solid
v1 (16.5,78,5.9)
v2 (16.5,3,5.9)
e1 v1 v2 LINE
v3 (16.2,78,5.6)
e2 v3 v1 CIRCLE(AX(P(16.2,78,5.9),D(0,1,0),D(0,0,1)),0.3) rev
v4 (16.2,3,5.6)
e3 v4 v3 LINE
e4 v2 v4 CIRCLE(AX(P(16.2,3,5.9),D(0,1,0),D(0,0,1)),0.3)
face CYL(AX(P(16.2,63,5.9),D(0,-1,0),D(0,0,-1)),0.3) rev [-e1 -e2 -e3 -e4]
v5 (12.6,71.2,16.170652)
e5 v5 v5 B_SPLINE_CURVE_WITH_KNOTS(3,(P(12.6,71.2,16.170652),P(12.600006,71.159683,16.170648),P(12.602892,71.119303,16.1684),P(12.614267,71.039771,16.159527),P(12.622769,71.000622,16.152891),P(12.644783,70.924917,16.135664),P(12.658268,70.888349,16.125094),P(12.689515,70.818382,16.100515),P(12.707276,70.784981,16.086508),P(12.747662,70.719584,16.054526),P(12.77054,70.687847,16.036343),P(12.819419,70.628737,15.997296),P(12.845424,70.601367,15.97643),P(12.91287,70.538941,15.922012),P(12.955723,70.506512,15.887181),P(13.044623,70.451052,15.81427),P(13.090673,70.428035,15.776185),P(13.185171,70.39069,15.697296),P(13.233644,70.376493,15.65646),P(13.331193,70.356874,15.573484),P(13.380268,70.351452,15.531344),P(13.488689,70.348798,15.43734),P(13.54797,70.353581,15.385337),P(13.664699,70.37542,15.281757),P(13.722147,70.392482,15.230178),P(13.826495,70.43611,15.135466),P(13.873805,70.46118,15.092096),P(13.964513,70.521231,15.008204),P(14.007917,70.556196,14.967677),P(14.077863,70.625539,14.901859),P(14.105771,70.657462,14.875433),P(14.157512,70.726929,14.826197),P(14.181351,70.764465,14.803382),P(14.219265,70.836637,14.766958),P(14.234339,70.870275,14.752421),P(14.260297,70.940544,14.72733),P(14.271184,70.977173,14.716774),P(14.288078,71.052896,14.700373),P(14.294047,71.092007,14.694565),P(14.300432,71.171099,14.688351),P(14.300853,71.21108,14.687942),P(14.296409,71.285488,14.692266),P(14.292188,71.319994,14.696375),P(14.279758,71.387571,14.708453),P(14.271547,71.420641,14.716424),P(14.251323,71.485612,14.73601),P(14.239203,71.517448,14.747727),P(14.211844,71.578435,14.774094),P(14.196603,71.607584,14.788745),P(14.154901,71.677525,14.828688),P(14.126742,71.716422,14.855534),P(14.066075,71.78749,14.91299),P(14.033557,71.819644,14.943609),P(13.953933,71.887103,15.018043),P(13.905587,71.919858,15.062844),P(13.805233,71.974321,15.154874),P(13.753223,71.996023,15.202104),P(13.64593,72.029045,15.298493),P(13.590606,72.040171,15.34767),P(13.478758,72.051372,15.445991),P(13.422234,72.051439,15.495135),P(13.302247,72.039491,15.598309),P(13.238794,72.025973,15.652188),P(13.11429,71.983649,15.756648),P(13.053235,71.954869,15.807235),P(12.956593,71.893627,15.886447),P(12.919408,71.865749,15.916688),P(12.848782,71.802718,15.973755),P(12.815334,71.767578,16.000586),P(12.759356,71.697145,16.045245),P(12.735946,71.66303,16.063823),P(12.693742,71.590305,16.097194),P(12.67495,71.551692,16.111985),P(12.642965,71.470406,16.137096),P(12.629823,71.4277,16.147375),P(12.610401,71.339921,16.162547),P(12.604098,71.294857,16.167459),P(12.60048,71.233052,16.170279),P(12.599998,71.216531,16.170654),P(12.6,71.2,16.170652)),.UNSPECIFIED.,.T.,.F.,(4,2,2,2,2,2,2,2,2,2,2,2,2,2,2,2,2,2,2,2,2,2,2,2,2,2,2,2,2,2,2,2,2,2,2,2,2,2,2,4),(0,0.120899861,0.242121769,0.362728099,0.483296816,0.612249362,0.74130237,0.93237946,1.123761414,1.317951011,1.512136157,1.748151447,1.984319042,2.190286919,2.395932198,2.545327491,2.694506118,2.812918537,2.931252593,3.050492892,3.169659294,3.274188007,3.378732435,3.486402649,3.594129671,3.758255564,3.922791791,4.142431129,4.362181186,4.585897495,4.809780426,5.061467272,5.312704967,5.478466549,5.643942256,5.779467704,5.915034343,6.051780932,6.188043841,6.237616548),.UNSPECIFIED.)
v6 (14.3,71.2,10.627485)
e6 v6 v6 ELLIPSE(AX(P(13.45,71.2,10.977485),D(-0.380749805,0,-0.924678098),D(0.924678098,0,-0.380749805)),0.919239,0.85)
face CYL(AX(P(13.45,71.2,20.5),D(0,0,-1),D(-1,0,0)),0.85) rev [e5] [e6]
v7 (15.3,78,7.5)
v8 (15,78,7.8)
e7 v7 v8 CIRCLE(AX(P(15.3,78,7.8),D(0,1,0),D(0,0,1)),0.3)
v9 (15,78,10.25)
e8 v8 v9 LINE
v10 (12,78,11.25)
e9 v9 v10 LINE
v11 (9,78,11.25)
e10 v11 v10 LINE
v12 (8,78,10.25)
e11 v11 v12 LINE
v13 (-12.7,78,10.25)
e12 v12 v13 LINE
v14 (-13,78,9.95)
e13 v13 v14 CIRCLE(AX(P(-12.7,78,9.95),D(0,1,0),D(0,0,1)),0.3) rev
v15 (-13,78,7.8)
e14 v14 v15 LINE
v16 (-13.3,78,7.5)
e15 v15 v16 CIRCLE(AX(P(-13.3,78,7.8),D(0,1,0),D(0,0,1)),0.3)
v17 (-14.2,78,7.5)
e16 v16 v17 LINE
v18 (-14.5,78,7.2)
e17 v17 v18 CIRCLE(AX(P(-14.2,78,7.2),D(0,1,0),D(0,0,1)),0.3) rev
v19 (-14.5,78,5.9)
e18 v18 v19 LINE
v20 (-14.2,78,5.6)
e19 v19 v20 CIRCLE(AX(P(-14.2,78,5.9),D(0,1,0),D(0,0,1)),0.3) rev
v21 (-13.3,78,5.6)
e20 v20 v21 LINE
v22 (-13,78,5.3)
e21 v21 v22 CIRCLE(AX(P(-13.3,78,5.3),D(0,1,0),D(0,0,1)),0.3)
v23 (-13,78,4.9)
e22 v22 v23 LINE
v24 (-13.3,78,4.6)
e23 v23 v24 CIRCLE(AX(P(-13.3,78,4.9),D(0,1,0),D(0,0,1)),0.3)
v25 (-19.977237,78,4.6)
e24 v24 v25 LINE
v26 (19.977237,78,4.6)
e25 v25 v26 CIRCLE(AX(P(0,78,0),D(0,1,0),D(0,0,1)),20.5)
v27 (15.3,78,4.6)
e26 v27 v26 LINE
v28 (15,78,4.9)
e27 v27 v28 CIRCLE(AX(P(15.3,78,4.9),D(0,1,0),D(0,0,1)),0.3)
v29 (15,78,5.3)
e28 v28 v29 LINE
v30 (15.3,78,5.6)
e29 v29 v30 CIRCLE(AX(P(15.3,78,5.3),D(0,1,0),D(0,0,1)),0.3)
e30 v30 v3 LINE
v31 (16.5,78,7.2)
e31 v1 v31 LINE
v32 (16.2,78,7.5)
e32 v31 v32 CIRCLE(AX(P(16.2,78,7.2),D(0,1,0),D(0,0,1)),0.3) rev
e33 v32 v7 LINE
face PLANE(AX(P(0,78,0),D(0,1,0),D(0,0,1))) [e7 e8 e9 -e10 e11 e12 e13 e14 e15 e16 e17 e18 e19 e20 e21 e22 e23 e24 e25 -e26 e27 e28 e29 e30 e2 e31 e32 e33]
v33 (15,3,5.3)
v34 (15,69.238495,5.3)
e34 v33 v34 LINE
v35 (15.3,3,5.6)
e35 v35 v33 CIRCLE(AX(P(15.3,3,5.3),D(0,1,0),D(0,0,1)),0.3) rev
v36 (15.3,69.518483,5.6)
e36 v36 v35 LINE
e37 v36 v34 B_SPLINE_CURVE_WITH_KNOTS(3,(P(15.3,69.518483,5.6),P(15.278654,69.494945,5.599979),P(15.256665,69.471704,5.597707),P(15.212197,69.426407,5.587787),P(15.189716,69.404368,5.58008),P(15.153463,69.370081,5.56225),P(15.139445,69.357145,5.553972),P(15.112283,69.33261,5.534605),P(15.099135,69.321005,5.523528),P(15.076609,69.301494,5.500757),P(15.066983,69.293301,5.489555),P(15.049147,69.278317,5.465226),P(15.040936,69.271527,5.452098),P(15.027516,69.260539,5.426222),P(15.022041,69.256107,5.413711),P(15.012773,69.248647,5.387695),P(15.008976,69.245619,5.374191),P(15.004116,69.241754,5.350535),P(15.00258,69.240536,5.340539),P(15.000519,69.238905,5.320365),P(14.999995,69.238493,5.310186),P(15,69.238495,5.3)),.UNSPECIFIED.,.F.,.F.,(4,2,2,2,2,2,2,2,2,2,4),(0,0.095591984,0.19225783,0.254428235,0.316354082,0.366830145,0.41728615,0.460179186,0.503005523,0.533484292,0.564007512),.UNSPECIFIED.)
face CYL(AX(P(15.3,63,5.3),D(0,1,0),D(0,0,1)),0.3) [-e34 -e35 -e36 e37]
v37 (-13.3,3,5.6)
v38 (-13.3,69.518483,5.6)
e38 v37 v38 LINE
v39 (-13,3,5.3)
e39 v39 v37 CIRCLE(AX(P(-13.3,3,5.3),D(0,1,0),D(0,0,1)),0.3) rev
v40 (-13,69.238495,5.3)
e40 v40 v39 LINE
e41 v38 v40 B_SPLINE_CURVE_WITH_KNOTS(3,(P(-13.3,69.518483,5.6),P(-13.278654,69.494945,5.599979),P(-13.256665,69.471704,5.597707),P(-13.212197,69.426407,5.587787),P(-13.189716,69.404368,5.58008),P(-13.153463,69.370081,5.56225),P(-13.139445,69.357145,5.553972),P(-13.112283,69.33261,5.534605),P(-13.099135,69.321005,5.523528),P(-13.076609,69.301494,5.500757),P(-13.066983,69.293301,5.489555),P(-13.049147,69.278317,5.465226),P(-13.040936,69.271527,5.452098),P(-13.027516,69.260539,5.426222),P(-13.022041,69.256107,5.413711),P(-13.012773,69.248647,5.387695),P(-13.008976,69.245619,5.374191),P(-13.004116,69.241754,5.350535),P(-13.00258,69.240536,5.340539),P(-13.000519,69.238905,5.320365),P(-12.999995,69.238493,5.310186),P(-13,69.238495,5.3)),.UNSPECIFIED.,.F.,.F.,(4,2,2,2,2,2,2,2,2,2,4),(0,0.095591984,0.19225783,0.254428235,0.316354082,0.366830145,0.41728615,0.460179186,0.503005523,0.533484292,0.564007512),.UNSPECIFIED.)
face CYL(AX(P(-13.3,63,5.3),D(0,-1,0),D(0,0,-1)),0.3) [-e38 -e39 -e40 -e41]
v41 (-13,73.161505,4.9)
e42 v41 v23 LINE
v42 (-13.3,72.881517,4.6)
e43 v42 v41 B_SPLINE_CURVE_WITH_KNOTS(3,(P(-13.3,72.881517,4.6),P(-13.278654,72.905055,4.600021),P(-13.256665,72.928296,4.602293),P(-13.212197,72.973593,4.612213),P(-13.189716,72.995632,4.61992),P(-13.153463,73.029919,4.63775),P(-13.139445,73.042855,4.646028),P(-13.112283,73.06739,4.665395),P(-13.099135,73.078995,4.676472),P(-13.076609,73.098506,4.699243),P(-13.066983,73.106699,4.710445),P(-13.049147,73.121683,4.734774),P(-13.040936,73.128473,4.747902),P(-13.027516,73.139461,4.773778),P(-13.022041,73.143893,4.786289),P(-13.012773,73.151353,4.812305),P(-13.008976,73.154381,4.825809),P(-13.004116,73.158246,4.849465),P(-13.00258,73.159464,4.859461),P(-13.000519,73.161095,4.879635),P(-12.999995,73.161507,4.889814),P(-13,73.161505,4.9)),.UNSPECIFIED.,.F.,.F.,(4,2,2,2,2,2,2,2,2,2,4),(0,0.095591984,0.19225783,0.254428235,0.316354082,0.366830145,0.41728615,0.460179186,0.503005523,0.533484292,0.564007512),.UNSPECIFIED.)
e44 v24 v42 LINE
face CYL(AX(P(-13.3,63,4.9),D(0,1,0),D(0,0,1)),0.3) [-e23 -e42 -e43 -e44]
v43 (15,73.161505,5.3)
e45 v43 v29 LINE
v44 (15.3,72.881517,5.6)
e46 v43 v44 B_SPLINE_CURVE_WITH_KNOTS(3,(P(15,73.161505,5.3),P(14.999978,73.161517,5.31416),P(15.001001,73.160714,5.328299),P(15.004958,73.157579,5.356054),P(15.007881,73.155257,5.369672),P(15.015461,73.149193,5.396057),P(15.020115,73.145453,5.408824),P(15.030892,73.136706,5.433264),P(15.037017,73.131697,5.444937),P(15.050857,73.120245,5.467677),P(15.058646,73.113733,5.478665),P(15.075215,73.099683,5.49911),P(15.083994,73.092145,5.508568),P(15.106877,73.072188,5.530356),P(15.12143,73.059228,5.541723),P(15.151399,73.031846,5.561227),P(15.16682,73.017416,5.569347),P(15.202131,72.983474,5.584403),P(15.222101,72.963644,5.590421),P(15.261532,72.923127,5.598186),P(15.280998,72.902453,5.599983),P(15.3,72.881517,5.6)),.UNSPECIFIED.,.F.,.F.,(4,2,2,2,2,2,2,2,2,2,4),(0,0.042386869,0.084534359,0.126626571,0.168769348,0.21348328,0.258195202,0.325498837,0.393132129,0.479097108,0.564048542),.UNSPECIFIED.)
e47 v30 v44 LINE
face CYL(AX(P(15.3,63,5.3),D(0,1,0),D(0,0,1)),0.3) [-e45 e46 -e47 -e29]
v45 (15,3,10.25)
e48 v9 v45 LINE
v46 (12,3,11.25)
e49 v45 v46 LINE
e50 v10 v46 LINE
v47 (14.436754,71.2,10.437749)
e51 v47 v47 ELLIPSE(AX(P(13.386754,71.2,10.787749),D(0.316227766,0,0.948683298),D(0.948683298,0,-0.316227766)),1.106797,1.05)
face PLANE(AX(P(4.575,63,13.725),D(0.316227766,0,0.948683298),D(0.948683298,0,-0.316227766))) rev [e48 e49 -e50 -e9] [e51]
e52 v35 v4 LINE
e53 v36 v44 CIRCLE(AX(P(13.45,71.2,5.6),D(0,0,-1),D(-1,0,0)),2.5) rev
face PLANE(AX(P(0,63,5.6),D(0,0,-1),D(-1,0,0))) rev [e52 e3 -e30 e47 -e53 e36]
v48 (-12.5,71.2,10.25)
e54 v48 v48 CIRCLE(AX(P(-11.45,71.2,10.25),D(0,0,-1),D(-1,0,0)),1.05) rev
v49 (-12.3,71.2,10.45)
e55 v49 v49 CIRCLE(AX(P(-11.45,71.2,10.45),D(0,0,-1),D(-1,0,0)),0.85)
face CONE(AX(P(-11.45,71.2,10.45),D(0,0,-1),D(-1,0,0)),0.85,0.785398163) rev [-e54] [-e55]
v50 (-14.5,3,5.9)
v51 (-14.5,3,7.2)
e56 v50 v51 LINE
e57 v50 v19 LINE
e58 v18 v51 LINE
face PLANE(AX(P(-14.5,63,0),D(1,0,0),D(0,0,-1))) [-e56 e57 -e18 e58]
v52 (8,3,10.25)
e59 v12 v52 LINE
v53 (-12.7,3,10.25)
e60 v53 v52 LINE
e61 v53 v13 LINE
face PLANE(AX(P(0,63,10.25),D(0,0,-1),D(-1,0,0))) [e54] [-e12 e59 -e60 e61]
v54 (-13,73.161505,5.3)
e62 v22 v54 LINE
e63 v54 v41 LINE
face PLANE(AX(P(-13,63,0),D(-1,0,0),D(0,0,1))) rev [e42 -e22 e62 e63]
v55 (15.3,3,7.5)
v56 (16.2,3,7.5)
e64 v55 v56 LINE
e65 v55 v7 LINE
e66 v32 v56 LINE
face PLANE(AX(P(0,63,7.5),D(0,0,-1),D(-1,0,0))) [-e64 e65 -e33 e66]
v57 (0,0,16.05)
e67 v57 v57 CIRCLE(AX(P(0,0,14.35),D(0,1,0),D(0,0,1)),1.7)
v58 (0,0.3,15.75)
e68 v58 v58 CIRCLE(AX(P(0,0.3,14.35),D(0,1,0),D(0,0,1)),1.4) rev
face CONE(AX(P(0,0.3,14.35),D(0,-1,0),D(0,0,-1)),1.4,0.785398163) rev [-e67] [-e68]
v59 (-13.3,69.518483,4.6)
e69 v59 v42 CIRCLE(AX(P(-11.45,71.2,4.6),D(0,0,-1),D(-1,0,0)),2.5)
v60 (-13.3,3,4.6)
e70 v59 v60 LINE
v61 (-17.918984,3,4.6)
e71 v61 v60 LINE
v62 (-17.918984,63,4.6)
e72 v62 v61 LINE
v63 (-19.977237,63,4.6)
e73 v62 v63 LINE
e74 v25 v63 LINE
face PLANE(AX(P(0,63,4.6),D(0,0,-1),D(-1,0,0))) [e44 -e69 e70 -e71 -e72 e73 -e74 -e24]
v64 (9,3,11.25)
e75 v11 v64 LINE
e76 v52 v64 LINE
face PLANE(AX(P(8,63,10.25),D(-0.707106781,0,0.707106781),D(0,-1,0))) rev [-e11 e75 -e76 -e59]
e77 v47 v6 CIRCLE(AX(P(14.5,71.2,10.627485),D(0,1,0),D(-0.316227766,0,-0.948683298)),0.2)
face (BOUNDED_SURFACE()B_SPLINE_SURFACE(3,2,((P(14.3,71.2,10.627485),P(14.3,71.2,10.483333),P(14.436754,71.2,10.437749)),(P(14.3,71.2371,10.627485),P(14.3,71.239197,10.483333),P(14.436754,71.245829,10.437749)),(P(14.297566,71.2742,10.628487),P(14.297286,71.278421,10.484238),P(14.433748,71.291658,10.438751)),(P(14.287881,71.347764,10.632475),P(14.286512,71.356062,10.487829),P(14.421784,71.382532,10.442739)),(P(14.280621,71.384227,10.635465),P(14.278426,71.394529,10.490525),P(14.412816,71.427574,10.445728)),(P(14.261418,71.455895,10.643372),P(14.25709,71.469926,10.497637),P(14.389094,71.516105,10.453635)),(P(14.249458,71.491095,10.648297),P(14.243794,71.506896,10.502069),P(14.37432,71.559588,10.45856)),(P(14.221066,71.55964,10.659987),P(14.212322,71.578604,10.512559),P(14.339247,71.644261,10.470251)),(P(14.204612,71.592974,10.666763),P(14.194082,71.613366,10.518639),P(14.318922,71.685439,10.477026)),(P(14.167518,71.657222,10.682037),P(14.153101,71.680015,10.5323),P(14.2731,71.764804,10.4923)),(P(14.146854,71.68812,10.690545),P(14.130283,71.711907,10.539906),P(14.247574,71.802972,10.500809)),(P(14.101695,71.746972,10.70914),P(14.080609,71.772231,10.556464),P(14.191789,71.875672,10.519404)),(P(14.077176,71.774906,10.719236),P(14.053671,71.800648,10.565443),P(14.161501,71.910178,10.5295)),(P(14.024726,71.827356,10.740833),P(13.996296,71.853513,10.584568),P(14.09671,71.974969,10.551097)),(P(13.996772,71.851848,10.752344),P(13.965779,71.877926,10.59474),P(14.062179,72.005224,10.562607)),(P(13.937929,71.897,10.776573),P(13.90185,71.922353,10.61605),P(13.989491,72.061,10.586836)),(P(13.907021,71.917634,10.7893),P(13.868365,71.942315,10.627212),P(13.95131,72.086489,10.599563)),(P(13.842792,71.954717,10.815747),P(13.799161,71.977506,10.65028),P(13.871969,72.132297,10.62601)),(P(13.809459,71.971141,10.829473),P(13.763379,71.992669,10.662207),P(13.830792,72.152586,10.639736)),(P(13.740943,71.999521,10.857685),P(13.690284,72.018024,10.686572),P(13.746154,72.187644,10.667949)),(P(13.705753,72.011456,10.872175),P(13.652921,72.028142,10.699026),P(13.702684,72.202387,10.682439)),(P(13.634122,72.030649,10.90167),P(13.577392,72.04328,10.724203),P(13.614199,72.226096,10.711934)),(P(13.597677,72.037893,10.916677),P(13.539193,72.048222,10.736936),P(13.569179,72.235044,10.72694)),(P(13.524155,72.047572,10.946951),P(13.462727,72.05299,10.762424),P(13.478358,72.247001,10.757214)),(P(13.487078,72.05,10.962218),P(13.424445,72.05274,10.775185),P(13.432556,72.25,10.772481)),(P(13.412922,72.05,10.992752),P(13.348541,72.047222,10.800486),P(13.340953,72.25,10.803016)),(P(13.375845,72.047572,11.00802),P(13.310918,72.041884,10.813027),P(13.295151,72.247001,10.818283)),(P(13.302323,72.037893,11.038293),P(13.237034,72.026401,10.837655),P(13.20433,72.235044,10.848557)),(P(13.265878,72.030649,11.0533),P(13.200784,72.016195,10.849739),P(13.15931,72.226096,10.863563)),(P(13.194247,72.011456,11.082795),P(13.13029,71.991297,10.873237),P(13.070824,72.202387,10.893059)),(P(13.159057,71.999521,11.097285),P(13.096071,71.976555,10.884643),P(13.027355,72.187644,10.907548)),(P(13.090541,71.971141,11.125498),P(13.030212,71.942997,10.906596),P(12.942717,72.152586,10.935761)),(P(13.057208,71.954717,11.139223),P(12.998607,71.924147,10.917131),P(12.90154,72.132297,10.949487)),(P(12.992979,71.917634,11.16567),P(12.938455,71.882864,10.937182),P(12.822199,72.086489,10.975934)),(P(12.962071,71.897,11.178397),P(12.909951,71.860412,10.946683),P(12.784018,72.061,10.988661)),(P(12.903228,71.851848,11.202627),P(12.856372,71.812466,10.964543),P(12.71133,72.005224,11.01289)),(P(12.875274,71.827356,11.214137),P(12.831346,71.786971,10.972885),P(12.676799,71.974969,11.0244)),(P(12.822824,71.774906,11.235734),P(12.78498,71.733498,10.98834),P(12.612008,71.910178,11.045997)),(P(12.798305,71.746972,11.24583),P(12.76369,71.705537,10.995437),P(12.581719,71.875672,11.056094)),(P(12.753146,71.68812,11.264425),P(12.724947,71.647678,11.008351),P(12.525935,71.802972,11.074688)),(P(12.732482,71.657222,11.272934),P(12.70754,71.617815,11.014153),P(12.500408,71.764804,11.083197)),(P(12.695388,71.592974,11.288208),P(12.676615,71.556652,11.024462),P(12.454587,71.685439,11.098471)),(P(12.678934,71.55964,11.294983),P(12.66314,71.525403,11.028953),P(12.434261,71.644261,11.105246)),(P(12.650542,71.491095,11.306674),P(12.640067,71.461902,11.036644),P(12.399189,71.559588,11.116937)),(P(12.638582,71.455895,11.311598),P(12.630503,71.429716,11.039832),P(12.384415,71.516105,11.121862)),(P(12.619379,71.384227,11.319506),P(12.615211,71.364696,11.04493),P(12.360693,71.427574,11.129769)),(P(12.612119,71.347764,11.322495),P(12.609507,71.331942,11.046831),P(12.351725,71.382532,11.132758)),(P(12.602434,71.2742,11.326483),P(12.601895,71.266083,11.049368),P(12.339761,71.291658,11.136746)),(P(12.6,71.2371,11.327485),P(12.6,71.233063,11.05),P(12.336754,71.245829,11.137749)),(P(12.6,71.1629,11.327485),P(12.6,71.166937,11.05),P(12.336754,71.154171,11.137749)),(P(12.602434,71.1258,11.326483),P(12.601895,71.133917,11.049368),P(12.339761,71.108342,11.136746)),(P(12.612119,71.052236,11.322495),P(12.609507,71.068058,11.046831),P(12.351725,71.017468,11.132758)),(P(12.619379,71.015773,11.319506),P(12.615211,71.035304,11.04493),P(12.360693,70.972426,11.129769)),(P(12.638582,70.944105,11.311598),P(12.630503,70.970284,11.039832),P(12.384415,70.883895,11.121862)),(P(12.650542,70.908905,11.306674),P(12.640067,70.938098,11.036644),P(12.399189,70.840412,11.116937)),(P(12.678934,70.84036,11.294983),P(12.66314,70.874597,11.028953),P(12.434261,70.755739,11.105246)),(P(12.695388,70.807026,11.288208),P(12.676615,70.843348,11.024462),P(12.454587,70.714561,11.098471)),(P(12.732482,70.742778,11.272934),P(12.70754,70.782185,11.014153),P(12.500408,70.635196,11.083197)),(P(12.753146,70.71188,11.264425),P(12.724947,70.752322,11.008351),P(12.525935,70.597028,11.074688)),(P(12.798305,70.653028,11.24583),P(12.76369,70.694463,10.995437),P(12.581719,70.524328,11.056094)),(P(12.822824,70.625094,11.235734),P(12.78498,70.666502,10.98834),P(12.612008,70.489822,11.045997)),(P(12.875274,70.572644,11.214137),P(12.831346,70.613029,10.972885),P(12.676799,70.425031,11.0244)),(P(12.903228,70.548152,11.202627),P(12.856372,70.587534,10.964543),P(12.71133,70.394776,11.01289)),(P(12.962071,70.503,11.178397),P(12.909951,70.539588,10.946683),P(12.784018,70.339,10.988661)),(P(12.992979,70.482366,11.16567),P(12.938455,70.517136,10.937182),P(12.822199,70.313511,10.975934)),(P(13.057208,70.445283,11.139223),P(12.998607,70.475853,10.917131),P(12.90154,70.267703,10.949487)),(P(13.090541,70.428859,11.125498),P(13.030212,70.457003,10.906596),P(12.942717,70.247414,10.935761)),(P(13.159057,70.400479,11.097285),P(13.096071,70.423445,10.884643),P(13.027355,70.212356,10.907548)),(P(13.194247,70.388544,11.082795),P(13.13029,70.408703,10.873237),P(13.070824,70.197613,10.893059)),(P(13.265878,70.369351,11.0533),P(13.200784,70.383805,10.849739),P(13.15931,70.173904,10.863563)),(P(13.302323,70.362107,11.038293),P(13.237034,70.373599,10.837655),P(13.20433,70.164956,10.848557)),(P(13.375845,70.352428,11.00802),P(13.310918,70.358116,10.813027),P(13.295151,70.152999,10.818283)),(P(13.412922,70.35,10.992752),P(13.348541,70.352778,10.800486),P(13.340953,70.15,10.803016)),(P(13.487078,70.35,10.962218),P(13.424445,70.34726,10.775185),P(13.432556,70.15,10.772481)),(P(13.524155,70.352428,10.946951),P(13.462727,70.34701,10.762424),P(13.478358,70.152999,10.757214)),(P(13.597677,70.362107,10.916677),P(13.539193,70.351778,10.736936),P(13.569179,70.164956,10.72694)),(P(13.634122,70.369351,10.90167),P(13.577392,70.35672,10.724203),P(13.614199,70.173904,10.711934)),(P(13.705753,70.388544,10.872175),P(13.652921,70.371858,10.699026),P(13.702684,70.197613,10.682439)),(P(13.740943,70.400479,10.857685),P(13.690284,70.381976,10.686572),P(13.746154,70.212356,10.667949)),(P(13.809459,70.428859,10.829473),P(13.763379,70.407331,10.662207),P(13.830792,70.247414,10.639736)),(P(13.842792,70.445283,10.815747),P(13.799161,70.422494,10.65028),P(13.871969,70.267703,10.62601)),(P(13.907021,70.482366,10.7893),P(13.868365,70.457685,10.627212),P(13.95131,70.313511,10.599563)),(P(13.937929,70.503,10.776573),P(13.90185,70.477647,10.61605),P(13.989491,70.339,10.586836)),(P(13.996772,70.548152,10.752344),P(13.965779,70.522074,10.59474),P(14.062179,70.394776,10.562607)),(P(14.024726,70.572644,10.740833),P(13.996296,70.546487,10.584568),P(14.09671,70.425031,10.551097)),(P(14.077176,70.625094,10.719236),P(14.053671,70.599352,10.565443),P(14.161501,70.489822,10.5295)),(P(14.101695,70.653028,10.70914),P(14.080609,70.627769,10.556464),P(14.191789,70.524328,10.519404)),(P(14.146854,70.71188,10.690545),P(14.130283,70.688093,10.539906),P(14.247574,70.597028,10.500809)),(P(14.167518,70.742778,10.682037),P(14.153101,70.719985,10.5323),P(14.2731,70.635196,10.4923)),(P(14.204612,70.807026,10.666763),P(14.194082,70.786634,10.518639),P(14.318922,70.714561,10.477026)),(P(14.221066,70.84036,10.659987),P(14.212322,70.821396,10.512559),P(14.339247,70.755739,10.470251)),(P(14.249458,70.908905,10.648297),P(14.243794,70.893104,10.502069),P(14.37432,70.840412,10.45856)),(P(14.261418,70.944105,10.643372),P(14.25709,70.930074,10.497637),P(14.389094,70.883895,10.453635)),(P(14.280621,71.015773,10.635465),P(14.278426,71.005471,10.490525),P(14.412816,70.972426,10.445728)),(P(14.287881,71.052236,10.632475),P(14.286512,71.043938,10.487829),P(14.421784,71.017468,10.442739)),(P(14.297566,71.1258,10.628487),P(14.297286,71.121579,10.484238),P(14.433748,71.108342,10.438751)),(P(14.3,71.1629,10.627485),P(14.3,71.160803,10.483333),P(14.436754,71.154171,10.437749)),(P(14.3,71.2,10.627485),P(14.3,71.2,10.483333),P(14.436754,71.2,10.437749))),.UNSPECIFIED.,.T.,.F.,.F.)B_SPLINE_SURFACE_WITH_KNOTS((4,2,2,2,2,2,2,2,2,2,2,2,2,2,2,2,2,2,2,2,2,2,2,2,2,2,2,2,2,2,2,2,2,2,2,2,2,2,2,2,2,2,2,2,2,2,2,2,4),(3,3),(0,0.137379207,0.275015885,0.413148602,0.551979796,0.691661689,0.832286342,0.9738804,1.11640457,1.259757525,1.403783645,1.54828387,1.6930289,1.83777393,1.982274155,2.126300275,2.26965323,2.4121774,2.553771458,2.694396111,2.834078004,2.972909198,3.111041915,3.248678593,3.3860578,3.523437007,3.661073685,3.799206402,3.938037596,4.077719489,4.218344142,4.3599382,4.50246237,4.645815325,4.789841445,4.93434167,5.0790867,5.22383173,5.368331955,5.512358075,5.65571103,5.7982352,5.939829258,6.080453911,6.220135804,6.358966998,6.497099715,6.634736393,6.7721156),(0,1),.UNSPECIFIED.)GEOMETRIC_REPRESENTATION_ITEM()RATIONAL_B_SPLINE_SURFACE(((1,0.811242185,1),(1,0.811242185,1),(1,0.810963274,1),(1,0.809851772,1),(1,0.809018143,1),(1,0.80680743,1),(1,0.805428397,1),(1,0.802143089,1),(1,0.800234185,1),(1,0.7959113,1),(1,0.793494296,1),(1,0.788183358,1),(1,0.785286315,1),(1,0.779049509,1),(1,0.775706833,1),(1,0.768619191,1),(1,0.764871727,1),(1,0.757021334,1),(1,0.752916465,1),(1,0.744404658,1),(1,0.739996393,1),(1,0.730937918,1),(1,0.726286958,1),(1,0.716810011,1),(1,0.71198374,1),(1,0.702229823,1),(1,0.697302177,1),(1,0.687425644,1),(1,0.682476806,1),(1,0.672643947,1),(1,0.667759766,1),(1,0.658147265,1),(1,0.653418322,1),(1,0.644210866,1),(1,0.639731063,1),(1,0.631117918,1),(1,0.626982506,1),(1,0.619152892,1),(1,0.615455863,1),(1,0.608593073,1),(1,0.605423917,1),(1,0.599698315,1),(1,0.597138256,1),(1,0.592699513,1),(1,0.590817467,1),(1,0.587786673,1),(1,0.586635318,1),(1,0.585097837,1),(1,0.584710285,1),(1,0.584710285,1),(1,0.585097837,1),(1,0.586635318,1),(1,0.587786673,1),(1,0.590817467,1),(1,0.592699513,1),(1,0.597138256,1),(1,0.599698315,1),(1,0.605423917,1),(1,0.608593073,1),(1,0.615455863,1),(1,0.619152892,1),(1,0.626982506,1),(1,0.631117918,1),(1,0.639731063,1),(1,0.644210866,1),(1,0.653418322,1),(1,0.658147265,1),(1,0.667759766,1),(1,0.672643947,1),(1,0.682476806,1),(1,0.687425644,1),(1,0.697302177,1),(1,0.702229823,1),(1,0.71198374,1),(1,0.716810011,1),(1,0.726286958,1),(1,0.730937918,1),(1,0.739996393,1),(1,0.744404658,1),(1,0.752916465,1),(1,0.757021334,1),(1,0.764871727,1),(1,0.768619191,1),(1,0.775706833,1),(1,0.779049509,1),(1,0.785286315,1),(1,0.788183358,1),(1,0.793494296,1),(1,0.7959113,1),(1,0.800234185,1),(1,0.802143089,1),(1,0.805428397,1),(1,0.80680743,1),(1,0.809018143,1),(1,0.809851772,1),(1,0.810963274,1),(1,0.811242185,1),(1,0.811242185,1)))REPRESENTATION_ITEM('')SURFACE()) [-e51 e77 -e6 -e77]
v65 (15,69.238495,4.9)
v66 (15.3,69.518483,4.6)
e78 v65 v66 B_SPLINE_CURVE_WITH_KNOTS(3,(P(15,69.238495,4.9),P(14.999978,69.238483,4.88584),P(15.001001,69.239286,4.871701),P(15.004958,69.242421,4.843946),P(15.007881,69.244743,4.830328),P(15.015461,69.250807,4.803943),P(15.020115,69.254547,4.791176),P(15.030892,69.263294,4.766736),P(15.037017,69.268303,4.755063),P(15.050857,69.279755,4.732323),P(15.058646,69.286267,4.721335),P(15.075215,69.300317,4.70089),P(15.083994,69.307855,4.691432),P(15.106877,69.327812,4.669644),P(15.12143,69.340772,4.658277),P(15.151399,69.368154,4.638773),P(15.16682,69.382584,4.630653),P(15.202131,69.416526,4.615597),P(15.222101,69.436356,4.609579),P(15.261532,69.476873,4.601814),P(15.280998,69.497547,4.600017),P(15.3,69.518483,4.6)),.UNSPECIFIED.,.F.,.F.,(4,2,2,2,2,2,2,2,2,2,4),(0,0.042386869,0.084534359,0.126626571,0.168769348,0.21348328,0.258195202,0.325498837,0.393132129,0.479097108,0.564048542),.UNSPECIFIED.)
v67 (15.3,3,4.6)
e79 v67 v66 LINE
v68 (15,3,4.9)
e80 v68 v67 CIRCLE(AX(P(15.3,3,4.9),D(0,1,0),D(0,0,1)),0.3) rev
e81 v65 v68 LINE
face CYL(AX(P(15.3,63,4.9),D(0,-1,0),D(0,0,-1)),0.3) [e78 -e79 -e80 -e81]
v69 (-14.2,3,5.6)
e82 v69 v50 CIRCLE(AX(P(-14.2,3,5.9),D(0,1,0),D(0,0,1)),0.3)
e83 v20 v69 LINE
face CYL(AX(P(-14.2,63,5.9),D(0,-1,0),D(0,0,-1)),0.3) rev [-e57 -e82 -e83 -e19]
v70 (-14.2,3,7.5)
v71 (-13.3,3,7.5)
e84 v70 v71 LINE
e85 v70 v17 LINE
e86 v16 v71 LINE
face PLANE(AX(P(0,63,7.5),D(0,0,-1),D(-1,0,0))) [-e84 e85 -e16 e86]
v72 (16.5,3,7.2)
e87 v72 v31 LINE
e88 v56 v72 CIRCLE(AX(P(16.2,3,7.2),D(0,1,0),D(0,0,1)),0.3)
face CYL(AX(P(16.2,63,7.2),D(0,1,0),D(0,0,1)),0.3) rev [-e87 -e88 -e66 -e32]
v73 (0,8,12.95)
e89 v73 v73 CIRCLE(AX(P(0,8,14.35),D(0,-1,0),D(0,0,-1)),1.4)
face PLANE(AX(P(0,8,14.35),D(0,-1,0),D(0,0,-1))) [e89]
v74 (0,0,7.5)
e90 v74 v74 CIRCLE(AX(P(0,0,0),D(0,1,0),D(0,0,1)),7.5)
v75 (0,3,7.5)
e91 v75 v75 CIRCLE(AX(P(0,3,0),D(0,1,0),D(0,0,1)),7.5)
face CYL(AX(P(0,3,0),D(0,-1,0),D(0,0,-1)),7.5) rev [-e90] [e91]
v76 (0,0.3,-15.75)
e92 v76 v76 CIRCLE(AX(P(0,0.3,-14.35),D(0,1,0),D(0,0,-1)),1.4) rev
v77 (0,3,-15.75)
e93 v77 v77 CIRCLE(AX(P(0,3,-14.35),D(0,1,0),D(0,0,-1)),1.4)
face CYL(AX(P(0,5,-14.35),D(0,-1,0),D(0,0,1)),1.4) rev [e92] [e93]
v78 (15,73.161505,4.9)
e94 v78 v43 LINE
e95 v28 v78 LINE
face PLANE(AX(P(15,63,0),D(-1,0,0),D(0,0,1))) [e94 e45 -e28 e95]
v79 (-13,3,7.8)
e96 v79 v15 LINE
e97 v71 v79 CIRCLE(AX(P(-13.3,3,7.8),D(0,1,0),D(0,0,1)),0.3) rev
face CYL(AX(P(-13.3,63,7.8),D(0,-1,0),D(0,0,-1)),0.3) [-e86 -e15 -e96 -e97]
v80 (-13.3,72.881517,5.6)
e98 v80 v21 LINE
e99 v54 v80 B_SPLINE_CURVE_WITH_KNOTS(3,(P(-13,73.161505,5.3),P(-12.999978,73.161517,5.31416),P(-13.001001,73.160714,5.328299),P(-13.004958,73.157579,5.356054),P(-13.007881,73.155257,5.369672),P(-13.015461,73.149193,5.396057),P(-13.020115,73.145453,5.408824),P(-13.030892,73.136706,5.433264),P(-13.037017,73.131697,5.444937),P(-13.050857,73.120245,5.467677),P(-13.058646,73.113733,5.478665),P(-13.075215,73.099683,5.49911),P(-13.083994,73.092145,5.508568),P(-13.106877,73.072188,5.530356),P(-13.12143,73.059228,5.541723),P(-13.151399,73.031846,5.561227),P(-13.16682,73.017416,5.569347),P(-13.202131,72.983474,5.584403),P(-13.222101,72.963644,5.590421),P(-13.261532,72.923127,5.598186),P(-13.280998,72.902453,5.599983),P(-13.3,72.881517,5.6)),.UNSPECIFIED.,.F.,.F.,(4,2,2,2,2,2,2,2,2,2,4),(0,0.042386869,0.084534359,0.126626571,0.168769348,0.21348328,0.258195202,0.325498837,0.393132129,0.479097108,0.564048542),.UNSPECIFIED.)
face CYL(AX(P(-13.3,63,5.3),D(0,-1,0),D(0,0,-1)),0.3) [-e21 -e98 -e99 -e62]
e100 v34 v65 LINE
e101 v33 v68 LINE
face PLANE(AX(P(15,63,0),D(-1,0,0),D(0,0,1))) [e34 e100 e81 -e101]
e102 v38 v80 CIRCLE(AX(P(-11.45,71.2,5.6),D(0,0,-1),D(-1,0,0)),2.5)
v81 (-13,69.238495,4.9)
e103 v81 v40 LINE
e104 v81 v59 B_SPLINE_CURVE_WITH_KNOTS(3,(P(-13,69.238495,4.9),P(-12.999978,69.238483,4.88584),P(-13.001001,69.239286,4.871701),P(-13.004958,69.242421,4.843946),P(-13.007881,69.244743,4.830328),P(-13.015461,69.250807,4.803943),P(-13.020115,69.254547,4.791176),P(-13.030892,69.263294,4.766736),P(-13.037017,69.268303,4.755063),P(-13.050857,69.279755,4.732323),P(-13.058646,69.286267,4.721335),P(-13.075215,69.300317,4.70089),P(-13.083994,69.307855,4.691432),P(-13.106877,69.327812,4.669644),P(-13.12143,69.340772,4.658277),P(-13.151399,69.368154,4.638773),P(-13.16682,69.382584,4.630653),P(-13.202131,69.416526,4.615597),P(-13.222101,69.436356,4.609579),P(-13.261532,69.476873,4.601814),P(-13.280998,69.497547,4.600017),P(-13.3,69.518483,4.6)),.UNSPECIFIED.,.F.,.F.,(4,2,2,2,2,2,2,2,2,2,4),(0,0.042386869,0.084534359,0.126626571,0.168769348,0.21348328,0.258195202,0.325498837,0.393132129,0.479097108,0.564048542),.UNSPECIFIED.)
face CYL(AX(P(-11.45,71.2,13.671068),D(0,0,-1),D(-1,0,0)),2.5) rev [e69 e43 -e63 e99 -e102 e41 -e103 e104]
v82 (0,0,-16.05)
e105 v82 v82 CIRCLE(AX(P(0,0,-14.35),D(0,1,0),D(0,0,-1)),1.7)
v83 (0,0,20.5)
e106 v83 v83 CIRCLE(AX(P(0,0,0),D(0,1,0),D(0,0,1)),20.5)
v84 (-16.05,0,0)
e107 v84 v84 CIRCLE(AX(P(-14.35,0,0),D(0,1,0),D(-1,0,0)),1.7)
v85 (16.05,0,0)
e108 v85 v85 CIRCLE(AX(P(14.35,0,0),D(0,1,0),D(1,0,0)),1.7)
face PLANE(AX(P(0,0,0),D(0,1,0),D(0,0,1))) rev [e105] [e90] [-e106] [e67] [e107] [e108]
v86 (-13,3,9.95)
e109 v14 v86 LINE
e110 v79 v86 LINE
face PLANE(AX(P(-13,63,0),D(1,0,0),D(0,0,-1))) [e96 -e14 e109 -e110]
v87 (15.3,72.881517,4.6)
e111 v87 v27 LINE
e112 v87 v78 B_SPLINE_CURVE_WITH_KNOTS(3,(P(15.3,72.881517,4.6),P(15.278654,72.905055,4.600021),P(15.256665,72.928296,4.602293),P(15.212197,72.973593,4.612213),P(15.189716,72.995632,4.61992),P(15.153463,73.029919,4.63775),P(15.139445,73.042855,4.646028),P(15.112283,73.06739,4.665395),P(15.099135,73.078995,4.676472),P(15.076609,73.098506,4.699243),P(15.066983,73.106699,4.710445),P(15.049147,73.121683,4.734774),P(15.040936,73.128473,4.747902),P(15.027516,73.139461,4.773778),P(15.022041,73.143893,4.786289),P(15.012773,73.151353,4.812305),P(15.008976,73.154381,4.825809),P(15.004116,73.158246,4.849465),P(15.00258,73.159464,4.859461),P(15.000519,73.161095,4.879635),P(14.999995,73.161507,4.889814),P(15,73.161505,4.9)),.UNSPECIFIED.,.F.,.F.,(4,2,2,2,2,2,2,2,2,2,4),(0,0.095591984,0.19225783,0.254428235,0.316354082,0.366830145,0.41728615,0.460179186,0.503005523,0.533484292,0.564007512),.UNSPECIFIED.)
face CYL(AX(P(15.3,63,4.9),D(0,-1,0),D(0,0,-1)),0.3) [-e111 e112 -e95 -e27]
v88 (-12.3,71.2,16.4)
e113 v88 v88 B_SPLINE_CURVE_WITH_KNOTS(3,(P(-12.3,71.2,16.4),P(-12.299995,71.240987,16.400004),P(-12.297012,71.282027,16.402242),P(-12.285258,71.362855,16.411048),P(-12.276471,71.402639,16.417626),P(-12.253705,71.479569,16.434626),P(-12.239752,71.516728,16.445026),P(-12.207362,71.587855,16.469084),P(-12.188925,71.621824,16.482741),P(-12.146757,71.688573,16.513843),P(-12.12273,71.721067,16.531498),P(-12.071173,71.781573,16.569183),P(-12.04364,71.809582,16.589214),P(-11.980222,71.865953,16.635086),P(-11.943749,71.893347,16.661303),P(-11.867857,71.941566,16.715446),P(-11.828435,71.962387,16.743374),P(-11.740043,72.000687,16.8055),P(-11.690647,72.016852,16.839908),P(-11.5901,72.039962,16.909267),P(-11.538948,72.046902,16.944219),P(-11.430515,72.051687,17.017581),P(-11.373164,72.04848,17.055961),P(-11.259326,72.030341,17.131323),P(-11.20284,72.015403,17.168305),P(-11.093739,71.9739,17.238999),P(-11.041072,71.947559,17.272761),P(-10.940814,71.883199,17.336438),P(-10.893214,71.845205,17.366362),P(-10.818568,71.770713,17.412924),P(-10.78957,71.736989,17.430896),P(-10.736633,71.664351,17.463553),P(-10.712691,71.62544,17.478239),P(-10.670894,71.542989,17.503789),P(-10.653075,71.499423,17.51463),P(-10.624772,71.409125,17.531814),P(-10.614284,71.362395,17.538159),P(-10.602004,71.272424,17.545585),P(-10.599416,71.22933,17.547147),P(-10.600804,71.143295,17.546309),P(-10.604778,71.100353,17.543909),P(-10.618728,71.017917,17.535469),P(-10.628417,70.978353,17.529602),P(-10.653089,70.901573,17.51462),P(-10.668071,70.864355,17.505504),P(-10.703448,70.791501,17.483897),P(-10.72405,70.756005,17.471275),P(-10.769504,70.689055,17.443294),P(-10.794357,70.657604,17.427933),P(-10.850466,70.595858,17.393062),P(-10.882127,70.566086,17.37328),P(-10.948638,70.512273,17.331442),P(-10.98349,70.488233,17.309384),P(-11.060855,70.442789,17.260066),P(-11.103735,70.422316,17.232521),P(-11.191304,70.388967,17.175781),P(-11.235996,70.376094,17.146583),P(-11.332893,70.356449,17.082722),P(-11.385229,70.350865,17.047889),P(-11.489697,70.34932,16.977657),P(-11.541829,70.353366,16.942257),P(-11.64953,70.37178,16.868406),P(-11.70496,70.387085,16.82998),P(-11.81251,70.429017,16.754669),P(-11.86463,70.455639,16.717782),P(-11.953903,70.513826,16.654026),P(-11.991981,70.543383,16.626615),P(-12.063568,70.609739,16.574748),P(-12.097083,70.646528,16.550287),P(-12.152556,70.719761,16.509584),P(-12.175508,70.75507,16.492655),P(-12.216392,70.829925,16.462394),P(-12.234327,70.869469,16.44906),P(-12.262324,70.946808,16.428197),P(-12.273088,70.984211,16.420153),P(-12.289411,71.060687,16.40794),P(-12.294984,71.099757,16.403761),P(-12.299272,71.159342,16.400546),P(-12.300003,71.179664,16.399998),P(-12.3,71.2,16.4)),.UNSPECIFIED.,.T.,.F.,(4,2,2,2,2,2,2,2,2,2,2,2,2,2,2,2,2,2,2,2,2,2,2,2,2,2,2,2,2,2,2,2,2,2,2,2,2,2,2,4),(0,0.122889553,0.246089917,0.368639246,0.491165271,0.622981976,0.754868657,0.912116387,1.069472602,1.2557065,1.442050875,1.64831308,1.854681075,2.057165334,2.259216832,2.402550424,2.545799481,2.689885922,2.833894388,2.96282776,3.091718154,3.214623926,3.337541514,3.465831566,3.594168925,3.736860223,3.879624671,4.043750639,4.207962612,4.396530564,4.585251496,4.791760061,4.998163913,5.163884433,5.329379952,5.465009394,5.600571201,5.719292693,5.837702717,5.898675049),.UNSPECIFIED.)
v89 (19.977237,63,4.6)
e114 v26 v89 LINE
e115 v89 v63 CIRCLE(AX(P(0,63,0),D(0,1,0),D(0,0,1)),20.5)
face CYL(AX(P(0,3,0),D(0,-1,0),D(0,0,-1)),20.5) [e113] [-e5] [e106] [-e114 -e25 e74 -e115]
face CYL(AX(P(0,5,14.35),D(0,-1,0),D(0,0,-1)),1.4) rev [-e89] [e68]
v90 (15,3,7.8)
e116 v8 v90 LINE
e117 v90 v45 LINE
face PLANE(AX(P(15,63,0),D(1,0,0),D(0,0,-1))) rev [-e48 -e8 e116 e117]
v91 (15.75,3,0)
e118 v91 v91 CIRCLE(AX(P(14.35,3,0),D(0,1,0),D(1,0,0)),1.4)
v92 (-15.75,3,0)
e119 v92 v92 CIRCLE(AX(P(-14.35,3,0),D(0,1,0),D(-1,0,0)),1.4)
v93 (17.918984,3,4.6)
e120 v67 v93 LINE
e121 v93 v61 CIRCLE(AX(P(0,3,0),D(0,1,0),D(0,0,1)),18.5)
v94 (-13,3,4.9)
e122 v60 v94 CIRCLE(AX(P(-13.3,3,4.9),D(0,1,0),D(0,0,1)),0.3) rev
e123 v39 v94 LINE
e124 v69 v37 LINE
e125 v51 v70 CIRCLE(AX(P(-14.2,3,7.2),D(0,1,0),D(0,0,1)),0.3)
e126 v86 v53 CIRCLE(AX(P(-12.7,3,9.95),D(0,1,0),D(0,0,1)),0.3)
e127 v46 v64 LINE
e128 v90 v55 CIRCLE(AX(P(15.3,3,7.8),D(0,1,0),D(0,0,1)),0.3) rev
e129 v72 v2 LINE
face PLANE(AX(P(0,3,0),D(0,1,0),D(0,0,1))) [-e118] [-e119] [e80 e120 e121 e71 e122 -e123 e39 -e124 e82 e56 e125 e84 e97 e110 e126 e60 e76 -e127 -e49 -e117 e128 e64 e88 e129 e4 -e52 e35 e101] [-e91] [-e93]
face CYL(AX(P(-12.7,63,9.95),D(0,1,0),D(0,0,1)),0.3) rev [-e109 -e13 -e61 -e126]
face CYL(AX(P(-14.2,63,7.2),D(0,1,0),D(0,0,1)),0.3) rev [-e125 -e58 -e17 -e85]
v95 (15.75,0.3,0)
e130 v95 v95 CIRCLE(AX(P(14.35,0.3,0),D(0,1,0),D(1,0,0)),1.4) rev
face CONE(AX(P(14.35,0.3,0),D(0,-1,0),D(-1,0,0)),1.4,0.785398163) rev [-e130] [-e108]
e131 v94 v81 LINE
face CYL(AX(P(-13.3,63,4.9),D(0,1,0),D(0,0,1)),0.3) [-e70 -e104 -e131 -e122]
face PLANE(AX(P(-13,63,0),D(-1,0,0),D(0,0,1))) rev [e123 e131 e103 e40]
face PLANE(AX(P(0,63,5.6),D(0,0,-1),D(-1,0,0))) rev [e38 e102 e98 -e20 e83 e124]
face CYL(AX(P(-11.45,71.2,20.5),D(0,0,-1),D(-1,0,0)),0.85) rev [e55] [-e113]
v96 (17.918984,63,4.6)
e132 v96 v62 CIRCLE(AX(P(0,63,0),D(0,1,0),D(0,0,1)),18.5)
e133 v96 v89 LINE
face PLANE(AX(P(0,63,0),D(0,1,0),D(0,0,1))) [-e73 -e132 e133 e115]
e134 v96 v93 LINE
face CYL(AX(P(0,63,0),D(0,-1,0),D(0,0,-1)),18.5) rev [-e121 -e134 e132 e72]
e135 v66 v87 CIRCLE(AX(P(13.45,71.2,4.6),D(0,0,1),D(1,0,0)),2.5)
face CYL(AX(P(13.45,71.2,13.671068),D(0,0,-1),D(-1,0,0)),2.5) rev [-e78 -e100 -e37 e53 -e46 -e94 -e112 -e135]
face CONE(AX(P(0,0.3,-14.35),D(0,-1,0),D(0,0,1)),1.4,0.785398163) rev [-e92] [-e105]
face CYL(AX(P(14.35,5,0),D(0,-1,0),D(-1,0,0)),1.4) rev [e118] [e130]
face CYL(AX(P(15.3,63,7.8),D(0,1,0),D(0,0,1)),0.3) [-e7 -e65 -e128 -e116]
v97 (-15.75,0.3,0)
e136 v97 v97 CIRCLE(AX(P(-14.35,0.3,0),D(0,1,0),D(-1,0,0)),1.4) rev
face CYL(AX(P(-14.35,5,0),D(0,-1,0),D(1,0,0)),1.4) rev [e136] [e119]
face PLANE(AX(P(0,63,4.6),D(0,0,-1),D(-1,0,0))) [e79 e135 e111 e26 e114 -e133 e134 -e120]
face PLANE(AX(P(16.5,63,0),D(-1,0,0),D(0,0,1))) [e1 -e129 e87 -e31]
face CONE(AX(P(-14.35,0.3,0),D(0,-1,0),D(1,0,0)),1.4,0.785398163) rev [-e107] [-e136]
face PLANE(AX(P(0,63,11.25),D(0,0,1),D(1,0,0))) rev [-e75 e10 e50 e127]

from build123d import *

# Parameters (mm, degrees)
SKETCH1_R                    = 20.5
SKETCH1_R_2                  = 7.5
BOSS_EXTRUDE1_DEPTH          = 3
SKETCH3_R                    = 1.4
CUT_EXTRUDE1_DEPTH           = 5
CHAMFER6_SIZE                = 0.3
CIRPATTERN2_COUNT            = 4
CHAMFER6_OF_CIRPATTERN2_SIZE = 0.3
SKETCH4_R                    = 20.5
SKETCH4_R_2                  = 1.4
SKETCH4_W                    = 1.5
SKETCH4_H                    = 1
BOSS_EXTRUDE2_DEPTH          = 60
SKETCH6_W                    = 1.5
SKETCH6_H                    = 1
BOSS_EXTRUDE4_DEPTH          = 15
FILLET1_R                    = 0.3
SKETCH7_R                    = 2.5
CUT_EXTRUDE2_DEPTH           = 1.5
SKETCH8_R                    = 0.85
CUT_EXTRUDE3_DEPTH           = 86.371248179
CHAMFER2_SIZE                = 0.2
CHAMFER4_SIZE                = 1
CHAMFER5_R                   = 0.2
SKETCH9_R                    = 1.4
CUT_EXTRUDE4_DEPTH           = 5


with BuildPart() as part:
    # Sketch1 → Boss-Extrude1 (new body)
    with BuildSketch(Plane(origin=(0, 0, 0), x_dir=(1, 0, 0), z_dir=(0, 1, 0))):
        with Locations(Location((0, 0, 0), (0, 0, 270))):
            Circle(SKETCH1_R)
        with Locations(Location((0, 0, 0), (0, 0, 270))):
            Circle(SKETCH1_R_2, mode=Mode.SUBTRACT)
    extrude(amount=BOSS_EXTRUDE1_DEPTH)

    # Sketch3 → Cut-Extrude1 (cut)
    with BuildSketch(Plane.XZ):
        with Locations(Location((0, 14.35, 0), (0, 0, 270))):
            Circle(SKETCH3_R)
    cut_extrude1 = extrude(amount=-CUT_EXTRUDE1_DEPTH, mode=Mode.SUBTRACT)

    # Chamfer6
    chamfer6_edges = [part.edges().sort_by_distance(p)[0] for p in [
        (0, 0, 15.75),
    ]]
    chamfer(chamfer6_edges, length=CHAMFER6_SIZE)

    # CirPattern2: Cut-Extrude1 ×4 about axis
    cirpattern2_axis = Axis((0, 0, 0), (0, 1, 0))
    for i in range(1, CIRPATTERN2_COUNT):
        add(cut_extrude1.rotate(cirpattern2_axis, i * 360 / CIRPATTERN2_COUNT), mode=Mode.SUBTRACT)

    # Chamfer6 of CirPattern2
    chamfer6_of_cirpattern2_edges = [part.edges().sort_by_distance(p)[0] for p in [
        (15.75, 0, 0),
        (0, 0, -15.75),
        (-15.75, 0, 0),
    ]]
    chamfer(chamfer6_of_cirpattern2_edges, length=CHAMFER6_OF_CIRPATTERN2_SIZE)

    # Sketch4 → Boss-Extrude2 (add)
    # profile 1 of 8: a face of its own
    with BuildSketch(Plane(origin=(0, 3, 0), x_dir=(1, 0, 0), z_dir=(0, 1, 0))):
        with Locations(Location((0, 0, 0), (0, 0, 270))):
            Circle(SKETCH4_R)
        with BuildLine():
            ThreePointArc((14.686303143, -11.25), (-3.697050438, -18.126825923), (-17.918984346, -4.6))
            ThreePointArc((-17.918984346, -4.6), (-2.318274099, 18.35417133), (18.5, 0))
            ThreePointArc((18.5, 0), (18.35417133, -2.318274099), (17.918984346, -4.6))
            ThreePointArc((17.918984346, -4.6), (16.751492877, -7.85095449), (15, -10.828203914))
            Line((15, -10.828203914), (15, -11.25))
            Line((15, -11.25), (14.686303143, -11.25))
        make_face(mode=Mode.SUBTRACT)
    # profile 2 of 8: a face of its own
    with BuildSketch(Plane(origin=(0, 3, 0), x_dir=(1, 0, 0), z_dir=(0, 1, 0))):
        with BuildLine():
            Line((-14.5, -7.5), (-14.5, -5.6))
            Line((-14.5, -5.6), (-14.5, -4.6))
            Line((-14.5, -4.6), (-17.918984346, -4.6))
            ThreePointArc((-17.918984346, -4.6), (-3.697050438, -18.126825923), (14.686303143, -11.25))
            Line((14.686303143, -11.25), (12, -11.25))
            Line((12, -11.25), (9, -11.25))
            Line((9, -11.25), (9, -10.25))
            Line((9, -10.25), (-13, -10.25))
            Line((-13, -10.25), (-13, -7.5))
            Line((-13, -7.5), (-14.5, -7.5))
        make_face()
        with Locations(Location((0, -14.35, 0), (0, 0, 270))):
            Circle(SKETCH4_R_2, mode=Mode.SUBTRACT)
    # profile 3 of 8: a face of its own
    with BuildSketch(Plane(origin=(0, 3, 0), x_dir=(1, 0, 0), z_dir=(0, 1, 0))):
        with BuildLine():
            Line((16.5, -4.6), (16.5, -5.6))
            Line((16.5, -5.6), (16.5, -7.5))
            Line((16.5, -7.5), (15, -7.5))
            Line((15, -7.5), (15, -10.25))
            Line((15, -10.25), (15, -10.828203914))
            ThreePointArc((15, -10.828203914), (16.751492877, -7.85095449), (17.918984346, -4.6))
            Line((17.918984346, -4.6), (16.5, -4.6))
        make_face()
    # profile 4 of 8: a face of its own
    with BuildSketch(Plane(origin=(0, 3, 0), x_dir=(1, 0, 0), z_dir=(0, 1, 0))):
        with BuildLine():
            Line((12, -11.25), (14.686303143, -11.25))
            ThreePointArc((14.686303143, -11.25), (14.844649762, -11.040216187), (15, -10.828203914))
            Line((15, -10.828203914), (15, -10.25))
            Line((15, -10.25), (12, -11.25))
        make_face()
    # profile 5 of 8: a face of its own
    with BuildSketch(Plane(origin=(0, 3, 0), x_dir=(1, 0, 0), z_dir=(0, 1, 0))):
        with Locations((15.75, -5.1)):
            Rectangle(SKETCH4_W, SKETCH4_H)
    # profile 6 of 8: a face of its own
    with BuildSketch(Plane(origin=(0, 3, 0), x_dir=(1, 0, 0), z_dir=(0, 1, 0))):
        with Locations((-13.75, -5.1)):
            Rectangle(SKETCH4_W, SKETCH4_H)
    # profile 7 of 8: a face of its own
    with BuildSketch(Plane(origin=(0, 3, 0), x_dir=(1, 0, 0), z_dir=(0, 1, 0))):
        with Locations(Location((0, -14.35, 0), (0, 0, 270))):
            Circle(SKETCH4_R_2)
    # profile 8 of 8: a face of its own
    with BuildSketch(Plane(origin=(0, 3, 0), x_dir=(1, 0, 0), z_dir=(0, 1, 0))):
        with BuildLine():
            ThreePointArc((15, -10.828203914), (14.844649762, -11.040216187), (14.686303143, -11.25))
            Line((14.686303143, -11.25), (15, -11.25))
            Line((15, -11.25), (15, -10.828203914))
        make_face()
    extrude(amount=BOSS_EXTRUDE2_DEPTH)

    # Sketch6 → Boss-Extrude4 (add)
    with BuildSketch(Plane(origin=(0, 63, 0), x_dir=(1, 0, 0), z_dir=(0, 1, 0))):
        with Locations((-13.75, -5.1)):
            Rectangle(SKETCH6_W, SKETCH6_H)
        with Locations((15.75, -5.1)):
            Rectangle(SKETCH6_W, SKETCH6_H)
        with BuildLine():
            Line((-14.5, -4.6), (-17.918984346, -4.6))
            ThreePointArc((-17.918984346, -4.6), (-3.697050438, -18.126825923), (14.686303143, -11.25))
            Line((14.686303143, -11.25), (12, -11.25))
            Line((12, -11.25), (9, -11.25))
            Line((9, -11.25), (9, -10.25))
            Line((9, -10.25), (-13, -10.25))
            Line((-13, -10.25), (-13, -7.5))
            Line((-13, -7.5), (-14.5, -7.5))
            Line((-14.5, -7.5), (-14.5, -5.6))
            Line((-14.5, -5.6), (-14.5, -4.6))
        make_face()
        with BuildLine():
            ThreePointArc((15, -10.828203914), (14.844649762, -11.040216187), (14.686303143, -11.25))
            Line((14.686303143, -11.25), (15, -11.25))
            Line((15, -11.25), (15, -10.828203914))
        make_face()
        with BuildLine():
            ThreePointArc((15, -10.828203914), (16.751492877, -7.85095449), (17.918984346, -4.6))
            Line((17.918984346, -4.6), (16.5, -4.6))
            Line((16.5, -4.6), (16.5, -5.6))
            Line((16.5, -5.6), (16.5, -7.5))
            Line((16.5, -7.5), (15, -7.5))
            Line((15, -7.5), (15, -10.25))
            Line((15, -10.25), (15, -10.828203914))
        make_face()
        with BuildLine():
            ThreePointArc((14.686303143, -11.25), (-3.697050438, -18.126825923), (-17.918984346, -4.6))
            Line((-17.918984346, -4.6), (-19.977237046, -4.6))
            ThreePointArc((-19.977237046, -4.6), (0, -20.5), (19.977237046, -4.6))
            Line((19.977237046, -4.6), (17.918984346, -4.6))
            ThreePointArc((17.918984346, -4.6), (16.751492877, -7.85095449), (15, -10.828203914))
            Line((15, -10.828203914), (15, -11.25))
            Line((15, -11.25), (14.686303143, -11.25))
        make_face()
        with BuildLine():
            Line((12, -11.25), (14.686303143, -11.25))
            ThreePointArc((14.686303143, -11.25), (14.844649762, -11.040216187), (15, -10.828203914))
            Line((15, -10.828203914), (15, -10.25))
            Line((15, -10.25), (12, -11.25))
        make_face()
    extrude(amount=BOSS_EXTRUDE4_DEPTH)

    # Fillet1
    fillet1_edges = [part.edges().sort_by_distance(p)[0] for p in [
        (15, 40.5, 4.6),
        (15, 40.5, 5.6),
        (16.5, 40.5, 5.6),
        (16.5, 40.5, 7.5),
        (15, 40.5, 7.5),
        (-13, 40.5, 10.25),
        (-13, 40.5, 7.5),
        (-14.5, 40.5, 7.5),
        (-14.5, 40.5, 5.6),
        (-13, 40.5, 5.6),
        (-13, 40.5, 4.6),
    ]]
    fillet(fillet1_edges, radius=FILLET1_R)

    # Sketch7 → Cut-Extrude2 (cut)
    with BuildSketch(Plane(origin=(0, 0, 4.6), x_dir=(-1, 0, 0), z_dir=(0, 0, -1))):
        with Locations((11.45, 71.2)):
            Circle(SKETCH7_R)
    cut_extrude2 = extrude(amount=-CUT_EXTRUDE2_DEPTH, mode=Mode.SUBTRACT)

    # Sketch8 → Cut-Extrude3 (cut, through all)
    with BuildSketch(Plane(origin=(0, 0, 7.5), x_dir=(-1, 0, 0), z_dir=(0, 0, -1))):
        with Locations((11.45, 71.2)):
            Circle(SKETCH8_R)
    cut_extrude3 = extrude(amount=-CUT_EXTRUDE3_DEPTH, mode=Mode.SUBTRACT)

    # Chamfer2
    chamfer2_edges = [part.edges().sort_by_distance(p)[0] for p in [
        (-10.6, 71.2, 10.25),
    ]]
    chamfer(chamfer2_edges, length=CHAMFER2_SIZE)

    # Mirror3: Cut-Extrude2, Cut-Extrude3 across plane
    add(cut_extrude2.mirror(Plane(origin=(1, 0, 0), x_dir=(0, 0, 1), z_dir=(1, 0, 0))), mode=Mode.SUBTRACT)
    add(cut_extrude3.mirror(Plane(origin=(1, 0, 0), x_dir=(0, 0, 1), z_dir=(1, 0, 0))), mode=Mode.SUBTRACT)

    # Chamfer4
    chamfer4_edges = [part.edges().sort_by_distance(p)[0] for p in [
        (9, 40.5, 10.25),
    ]]
    chamfer(chamfer4_edges, length=CHAMFER4_SIZE - 0.0001)  # a hair under: the kernel refuses the full size

    # Chamfer5
    chamfer5_edges = [part.edges().sort_by_distance(p)[0] for p in [
        (12.6, 71.199998189, 11.05),
    ]]
    fillet(chamfer5_edges, radius=CHAMFER5_R)

    # Sketch9 → Cut-Extrude4 (cut)
    with BuildSketch(Plane.XZ.offset(-3)):
        with Locations(Location((0, 14.35, 0), (0, 0, 270))):
            Circle(SKETCH9_R)
    extrude(amount=-CUT_EXTRUDE4_DEPTH, mode=Mode.SUBTRACT)


solid = part.part
